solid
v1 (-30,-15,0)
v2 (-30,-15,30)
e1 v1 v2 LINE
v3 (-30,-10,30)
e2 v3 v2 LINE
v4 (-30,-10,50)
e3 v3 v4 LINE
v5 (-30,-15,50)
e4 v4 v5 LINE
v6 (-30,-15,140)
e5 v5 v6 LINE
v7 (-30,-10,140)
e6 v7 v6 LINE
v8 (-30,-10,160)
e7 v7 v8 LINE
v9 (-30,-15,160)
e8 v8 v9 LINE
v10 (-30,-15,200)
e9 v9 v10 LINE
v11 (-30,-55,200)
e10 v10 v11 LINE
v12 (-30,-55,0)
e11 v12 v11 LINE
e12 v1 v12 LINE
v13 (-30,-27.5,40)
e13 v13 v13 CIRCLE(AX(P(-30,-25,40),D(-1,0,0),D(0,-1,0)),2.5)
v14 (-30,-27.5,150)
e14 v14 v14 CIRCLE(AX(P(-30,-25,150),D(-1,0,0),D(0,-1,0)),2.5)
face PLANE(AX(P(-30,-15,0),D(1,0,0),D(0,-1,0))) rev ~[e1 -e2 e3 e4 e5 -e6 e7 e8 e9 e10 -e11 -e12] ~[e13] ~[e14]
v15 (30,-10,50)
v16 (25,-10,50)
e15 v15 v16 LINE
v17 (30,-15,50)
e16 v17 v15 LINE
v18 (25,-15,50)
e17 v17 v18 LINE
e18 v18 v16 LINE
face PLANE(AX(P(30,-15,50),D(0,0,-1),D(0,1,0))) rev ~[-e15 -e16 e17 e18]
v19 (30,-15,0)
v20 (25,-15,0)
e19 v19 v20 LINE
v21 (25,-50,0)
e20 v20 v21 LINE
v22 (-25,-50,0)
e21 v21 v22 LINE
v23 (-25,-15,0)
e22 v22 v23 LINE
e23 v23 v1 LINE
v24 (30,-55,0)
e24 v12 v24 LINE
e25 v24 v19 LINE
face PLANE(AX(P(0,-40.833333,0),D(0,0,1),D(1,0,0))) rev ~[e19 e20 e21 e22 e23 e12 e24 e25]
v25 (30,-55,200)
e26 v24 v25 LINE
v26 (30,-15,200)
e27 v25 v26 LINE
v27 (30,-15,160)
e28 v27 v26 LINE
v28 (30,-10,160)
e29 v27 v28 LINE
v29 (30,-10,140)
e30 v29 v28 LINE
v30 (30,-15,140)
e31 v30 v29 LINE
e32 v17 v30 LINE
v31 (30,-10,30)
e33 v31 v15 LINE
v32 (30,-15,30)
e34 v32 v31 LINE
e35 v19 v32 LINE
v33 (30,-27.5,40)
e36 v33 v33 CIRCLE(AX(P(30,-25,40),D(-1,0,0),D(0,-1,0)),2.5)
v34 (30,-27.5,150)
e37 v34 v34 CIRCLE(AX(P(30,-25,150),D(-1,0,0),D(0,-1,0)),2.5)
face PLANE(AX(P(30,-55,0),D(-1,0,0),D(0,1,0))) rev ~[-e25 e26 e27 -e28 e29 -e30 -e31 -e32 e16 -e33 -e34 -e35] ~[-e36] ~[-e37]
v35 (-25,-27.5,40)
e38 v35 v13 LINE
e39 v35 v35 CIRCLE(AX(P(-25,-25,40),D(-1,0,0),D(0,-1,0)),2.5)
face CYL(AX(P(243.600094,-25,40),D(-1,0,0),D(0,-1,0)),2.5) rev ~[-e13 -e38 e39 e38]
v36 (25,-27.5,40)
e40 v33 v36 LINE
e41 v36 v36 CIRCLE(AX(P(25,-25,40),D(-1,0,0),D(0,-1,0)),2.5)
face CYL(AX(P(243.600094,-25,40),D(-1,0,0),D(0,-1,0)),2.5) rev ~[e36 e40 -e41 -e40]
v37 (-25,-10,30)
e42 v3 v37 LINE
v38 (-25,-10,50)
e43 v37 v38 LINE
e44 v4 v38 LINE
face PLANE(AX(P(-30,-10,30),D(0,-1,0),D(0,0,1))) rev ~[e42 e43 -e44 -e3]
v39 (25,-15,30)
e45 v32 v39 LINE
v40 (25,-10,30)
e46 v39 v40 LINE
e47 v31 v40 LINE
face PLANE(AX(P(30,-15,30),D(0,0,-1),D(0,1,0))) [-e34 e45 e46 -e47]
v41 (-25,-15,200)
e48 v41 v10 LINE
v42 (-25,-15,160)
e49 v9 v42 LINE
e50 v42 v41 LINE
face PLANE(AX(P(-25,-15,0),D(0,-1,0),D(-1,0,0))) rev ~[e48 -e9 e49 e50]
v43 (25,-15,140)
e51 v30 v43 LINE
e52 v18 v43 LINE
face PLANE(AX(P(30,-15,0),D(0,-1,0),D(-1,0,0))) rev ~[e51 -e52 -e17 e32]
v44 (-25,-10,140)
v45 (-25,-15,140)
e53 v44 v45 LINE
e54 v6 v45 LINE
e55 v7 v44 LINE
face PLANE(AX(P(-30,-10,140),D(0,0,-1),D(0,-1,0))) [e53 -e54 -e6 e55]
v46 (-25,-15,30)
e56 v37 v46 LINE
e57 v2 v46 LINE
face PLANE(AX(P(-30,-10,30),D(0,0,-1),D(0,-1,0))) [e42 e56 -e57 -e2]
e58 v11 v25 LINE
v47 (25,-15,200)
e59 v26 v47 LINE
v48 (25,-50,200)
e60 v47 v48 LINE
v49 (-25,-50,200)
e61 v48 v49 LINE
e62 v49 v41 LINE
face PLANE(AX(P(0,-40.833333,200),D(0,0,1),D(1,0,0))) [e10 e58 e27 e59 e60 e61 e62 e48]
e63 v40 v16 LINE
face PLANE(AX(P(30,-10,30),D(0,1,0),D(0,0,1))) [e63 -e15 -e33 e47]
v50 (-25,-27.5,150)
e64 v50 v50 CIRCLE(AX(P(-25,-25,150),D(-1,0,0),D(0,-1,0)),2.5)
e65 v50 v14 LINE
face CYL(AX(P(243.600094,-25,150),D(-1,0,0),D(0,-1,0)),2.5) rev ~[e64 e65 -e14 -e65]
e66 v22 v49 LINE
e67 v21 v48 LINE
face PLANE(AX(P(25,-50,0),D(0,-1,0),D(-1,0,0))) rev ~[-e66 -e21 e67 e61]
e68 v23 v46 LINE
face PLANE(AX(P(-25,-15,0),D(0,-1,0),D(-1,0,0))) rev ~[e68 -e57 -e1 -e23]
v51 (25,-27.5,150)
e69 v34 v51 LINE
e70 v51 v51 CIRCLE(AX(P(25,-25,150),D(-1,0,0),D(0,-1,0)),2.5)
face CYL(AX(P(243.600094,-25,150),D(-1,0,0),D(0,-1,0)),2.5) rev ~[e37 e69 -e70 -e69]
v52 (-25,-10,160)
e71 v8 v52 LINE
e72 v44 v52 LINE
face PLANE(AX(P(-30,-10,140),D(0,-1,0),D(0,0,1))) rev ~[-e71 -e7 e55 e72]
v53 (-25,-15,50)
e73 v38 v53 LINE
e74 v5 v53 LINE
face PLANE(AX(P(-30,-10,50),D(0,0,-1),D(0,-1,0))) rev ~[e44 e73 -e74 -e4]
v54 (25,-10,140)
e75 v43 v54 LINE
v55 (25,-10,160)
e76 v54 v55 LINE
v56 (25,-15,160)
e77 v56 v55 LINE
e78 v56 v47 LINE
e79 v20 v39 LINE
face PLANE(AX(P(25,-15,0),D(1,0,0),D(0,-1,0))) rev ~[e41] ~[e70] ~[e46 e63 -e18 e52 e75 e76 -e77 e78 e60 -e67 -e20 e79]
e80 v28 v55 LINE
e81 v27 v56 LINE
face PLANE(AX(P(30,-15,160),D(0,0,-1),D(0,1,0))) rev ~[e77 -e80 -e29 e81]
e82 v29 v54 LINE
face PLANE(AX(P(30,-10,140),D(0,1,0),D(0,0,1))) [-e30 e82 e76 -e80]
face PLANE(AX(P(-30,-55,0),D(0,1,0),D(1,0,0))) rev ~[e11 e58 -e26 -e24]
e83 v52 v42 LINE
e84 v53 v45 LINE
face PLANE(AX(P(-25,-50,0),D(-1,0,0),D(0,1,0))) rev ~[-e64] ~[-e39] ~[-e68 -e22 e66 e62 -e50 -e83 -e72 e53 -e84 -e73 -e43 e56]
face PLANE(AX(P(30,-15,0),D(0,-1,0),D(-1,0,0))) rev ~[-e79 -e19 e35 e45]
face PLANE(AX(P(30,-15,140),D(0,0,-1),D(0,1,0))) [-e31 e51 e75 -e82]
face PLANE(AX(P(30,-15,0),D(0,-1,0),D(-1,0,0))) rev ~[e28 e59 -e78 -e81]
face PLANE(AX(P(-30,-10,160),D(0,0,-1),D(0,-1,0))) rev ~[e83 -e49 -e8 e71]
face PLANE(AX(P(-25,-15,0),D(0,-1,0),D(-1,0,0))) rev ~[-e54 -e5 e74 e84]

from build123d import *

# Parameters (mm, degrees)
F2_DEPTH = 200
F3_W     = 5
F3_H     = 20
F4_DEPTH = 5
F5_W     = 5
F5_H     = 20
F6_DEPTH = 5
F7_D     = 5


with BuildPart() as f2:
    # F1 (on Top) → F2 (new body)
    with BuildSketch(Plane.XY):
        Polygon((30, -55), (30, -15), (25, -15), (25, -50), (-25, -50), (-25, -15), (-30, -15), (-30, -55), align=None)
    extrude(amount=F2_DEPTH)

    # F3 (on face) → F4 (join)
    with BuildSketch(Plane.YZ.offset(30)):
        with Locations((-12.5, 150)):
            Rectangle(F3_W, F3_H)
        with Locations((-12.5, 40)):
            Rectangle(F3_W, F3_H)
    extrude(amount=-F4_DEPTH)

    # F5 (on face) → F6 (join)
    with BuildSketch(Plane(origin=(-30, 0, 0), x_dir=(0, -1, 0), z_dir=(-1, 0, 0))):
        with Locations((12.5, 150)):
            Rectangle(F5_W, F5_H)
        with Locations((12.5, 40)):
            Rectangle(F5_W, F5_H)
    extrude(amount=-F6_DEPTH)

    # F7 (through all)
    with Locations(Plane.YZ.offset(30)):
        with Locations((-25, 150), (-25, 40)):
            Hole(F7_D / 2)


solid = f2.part
